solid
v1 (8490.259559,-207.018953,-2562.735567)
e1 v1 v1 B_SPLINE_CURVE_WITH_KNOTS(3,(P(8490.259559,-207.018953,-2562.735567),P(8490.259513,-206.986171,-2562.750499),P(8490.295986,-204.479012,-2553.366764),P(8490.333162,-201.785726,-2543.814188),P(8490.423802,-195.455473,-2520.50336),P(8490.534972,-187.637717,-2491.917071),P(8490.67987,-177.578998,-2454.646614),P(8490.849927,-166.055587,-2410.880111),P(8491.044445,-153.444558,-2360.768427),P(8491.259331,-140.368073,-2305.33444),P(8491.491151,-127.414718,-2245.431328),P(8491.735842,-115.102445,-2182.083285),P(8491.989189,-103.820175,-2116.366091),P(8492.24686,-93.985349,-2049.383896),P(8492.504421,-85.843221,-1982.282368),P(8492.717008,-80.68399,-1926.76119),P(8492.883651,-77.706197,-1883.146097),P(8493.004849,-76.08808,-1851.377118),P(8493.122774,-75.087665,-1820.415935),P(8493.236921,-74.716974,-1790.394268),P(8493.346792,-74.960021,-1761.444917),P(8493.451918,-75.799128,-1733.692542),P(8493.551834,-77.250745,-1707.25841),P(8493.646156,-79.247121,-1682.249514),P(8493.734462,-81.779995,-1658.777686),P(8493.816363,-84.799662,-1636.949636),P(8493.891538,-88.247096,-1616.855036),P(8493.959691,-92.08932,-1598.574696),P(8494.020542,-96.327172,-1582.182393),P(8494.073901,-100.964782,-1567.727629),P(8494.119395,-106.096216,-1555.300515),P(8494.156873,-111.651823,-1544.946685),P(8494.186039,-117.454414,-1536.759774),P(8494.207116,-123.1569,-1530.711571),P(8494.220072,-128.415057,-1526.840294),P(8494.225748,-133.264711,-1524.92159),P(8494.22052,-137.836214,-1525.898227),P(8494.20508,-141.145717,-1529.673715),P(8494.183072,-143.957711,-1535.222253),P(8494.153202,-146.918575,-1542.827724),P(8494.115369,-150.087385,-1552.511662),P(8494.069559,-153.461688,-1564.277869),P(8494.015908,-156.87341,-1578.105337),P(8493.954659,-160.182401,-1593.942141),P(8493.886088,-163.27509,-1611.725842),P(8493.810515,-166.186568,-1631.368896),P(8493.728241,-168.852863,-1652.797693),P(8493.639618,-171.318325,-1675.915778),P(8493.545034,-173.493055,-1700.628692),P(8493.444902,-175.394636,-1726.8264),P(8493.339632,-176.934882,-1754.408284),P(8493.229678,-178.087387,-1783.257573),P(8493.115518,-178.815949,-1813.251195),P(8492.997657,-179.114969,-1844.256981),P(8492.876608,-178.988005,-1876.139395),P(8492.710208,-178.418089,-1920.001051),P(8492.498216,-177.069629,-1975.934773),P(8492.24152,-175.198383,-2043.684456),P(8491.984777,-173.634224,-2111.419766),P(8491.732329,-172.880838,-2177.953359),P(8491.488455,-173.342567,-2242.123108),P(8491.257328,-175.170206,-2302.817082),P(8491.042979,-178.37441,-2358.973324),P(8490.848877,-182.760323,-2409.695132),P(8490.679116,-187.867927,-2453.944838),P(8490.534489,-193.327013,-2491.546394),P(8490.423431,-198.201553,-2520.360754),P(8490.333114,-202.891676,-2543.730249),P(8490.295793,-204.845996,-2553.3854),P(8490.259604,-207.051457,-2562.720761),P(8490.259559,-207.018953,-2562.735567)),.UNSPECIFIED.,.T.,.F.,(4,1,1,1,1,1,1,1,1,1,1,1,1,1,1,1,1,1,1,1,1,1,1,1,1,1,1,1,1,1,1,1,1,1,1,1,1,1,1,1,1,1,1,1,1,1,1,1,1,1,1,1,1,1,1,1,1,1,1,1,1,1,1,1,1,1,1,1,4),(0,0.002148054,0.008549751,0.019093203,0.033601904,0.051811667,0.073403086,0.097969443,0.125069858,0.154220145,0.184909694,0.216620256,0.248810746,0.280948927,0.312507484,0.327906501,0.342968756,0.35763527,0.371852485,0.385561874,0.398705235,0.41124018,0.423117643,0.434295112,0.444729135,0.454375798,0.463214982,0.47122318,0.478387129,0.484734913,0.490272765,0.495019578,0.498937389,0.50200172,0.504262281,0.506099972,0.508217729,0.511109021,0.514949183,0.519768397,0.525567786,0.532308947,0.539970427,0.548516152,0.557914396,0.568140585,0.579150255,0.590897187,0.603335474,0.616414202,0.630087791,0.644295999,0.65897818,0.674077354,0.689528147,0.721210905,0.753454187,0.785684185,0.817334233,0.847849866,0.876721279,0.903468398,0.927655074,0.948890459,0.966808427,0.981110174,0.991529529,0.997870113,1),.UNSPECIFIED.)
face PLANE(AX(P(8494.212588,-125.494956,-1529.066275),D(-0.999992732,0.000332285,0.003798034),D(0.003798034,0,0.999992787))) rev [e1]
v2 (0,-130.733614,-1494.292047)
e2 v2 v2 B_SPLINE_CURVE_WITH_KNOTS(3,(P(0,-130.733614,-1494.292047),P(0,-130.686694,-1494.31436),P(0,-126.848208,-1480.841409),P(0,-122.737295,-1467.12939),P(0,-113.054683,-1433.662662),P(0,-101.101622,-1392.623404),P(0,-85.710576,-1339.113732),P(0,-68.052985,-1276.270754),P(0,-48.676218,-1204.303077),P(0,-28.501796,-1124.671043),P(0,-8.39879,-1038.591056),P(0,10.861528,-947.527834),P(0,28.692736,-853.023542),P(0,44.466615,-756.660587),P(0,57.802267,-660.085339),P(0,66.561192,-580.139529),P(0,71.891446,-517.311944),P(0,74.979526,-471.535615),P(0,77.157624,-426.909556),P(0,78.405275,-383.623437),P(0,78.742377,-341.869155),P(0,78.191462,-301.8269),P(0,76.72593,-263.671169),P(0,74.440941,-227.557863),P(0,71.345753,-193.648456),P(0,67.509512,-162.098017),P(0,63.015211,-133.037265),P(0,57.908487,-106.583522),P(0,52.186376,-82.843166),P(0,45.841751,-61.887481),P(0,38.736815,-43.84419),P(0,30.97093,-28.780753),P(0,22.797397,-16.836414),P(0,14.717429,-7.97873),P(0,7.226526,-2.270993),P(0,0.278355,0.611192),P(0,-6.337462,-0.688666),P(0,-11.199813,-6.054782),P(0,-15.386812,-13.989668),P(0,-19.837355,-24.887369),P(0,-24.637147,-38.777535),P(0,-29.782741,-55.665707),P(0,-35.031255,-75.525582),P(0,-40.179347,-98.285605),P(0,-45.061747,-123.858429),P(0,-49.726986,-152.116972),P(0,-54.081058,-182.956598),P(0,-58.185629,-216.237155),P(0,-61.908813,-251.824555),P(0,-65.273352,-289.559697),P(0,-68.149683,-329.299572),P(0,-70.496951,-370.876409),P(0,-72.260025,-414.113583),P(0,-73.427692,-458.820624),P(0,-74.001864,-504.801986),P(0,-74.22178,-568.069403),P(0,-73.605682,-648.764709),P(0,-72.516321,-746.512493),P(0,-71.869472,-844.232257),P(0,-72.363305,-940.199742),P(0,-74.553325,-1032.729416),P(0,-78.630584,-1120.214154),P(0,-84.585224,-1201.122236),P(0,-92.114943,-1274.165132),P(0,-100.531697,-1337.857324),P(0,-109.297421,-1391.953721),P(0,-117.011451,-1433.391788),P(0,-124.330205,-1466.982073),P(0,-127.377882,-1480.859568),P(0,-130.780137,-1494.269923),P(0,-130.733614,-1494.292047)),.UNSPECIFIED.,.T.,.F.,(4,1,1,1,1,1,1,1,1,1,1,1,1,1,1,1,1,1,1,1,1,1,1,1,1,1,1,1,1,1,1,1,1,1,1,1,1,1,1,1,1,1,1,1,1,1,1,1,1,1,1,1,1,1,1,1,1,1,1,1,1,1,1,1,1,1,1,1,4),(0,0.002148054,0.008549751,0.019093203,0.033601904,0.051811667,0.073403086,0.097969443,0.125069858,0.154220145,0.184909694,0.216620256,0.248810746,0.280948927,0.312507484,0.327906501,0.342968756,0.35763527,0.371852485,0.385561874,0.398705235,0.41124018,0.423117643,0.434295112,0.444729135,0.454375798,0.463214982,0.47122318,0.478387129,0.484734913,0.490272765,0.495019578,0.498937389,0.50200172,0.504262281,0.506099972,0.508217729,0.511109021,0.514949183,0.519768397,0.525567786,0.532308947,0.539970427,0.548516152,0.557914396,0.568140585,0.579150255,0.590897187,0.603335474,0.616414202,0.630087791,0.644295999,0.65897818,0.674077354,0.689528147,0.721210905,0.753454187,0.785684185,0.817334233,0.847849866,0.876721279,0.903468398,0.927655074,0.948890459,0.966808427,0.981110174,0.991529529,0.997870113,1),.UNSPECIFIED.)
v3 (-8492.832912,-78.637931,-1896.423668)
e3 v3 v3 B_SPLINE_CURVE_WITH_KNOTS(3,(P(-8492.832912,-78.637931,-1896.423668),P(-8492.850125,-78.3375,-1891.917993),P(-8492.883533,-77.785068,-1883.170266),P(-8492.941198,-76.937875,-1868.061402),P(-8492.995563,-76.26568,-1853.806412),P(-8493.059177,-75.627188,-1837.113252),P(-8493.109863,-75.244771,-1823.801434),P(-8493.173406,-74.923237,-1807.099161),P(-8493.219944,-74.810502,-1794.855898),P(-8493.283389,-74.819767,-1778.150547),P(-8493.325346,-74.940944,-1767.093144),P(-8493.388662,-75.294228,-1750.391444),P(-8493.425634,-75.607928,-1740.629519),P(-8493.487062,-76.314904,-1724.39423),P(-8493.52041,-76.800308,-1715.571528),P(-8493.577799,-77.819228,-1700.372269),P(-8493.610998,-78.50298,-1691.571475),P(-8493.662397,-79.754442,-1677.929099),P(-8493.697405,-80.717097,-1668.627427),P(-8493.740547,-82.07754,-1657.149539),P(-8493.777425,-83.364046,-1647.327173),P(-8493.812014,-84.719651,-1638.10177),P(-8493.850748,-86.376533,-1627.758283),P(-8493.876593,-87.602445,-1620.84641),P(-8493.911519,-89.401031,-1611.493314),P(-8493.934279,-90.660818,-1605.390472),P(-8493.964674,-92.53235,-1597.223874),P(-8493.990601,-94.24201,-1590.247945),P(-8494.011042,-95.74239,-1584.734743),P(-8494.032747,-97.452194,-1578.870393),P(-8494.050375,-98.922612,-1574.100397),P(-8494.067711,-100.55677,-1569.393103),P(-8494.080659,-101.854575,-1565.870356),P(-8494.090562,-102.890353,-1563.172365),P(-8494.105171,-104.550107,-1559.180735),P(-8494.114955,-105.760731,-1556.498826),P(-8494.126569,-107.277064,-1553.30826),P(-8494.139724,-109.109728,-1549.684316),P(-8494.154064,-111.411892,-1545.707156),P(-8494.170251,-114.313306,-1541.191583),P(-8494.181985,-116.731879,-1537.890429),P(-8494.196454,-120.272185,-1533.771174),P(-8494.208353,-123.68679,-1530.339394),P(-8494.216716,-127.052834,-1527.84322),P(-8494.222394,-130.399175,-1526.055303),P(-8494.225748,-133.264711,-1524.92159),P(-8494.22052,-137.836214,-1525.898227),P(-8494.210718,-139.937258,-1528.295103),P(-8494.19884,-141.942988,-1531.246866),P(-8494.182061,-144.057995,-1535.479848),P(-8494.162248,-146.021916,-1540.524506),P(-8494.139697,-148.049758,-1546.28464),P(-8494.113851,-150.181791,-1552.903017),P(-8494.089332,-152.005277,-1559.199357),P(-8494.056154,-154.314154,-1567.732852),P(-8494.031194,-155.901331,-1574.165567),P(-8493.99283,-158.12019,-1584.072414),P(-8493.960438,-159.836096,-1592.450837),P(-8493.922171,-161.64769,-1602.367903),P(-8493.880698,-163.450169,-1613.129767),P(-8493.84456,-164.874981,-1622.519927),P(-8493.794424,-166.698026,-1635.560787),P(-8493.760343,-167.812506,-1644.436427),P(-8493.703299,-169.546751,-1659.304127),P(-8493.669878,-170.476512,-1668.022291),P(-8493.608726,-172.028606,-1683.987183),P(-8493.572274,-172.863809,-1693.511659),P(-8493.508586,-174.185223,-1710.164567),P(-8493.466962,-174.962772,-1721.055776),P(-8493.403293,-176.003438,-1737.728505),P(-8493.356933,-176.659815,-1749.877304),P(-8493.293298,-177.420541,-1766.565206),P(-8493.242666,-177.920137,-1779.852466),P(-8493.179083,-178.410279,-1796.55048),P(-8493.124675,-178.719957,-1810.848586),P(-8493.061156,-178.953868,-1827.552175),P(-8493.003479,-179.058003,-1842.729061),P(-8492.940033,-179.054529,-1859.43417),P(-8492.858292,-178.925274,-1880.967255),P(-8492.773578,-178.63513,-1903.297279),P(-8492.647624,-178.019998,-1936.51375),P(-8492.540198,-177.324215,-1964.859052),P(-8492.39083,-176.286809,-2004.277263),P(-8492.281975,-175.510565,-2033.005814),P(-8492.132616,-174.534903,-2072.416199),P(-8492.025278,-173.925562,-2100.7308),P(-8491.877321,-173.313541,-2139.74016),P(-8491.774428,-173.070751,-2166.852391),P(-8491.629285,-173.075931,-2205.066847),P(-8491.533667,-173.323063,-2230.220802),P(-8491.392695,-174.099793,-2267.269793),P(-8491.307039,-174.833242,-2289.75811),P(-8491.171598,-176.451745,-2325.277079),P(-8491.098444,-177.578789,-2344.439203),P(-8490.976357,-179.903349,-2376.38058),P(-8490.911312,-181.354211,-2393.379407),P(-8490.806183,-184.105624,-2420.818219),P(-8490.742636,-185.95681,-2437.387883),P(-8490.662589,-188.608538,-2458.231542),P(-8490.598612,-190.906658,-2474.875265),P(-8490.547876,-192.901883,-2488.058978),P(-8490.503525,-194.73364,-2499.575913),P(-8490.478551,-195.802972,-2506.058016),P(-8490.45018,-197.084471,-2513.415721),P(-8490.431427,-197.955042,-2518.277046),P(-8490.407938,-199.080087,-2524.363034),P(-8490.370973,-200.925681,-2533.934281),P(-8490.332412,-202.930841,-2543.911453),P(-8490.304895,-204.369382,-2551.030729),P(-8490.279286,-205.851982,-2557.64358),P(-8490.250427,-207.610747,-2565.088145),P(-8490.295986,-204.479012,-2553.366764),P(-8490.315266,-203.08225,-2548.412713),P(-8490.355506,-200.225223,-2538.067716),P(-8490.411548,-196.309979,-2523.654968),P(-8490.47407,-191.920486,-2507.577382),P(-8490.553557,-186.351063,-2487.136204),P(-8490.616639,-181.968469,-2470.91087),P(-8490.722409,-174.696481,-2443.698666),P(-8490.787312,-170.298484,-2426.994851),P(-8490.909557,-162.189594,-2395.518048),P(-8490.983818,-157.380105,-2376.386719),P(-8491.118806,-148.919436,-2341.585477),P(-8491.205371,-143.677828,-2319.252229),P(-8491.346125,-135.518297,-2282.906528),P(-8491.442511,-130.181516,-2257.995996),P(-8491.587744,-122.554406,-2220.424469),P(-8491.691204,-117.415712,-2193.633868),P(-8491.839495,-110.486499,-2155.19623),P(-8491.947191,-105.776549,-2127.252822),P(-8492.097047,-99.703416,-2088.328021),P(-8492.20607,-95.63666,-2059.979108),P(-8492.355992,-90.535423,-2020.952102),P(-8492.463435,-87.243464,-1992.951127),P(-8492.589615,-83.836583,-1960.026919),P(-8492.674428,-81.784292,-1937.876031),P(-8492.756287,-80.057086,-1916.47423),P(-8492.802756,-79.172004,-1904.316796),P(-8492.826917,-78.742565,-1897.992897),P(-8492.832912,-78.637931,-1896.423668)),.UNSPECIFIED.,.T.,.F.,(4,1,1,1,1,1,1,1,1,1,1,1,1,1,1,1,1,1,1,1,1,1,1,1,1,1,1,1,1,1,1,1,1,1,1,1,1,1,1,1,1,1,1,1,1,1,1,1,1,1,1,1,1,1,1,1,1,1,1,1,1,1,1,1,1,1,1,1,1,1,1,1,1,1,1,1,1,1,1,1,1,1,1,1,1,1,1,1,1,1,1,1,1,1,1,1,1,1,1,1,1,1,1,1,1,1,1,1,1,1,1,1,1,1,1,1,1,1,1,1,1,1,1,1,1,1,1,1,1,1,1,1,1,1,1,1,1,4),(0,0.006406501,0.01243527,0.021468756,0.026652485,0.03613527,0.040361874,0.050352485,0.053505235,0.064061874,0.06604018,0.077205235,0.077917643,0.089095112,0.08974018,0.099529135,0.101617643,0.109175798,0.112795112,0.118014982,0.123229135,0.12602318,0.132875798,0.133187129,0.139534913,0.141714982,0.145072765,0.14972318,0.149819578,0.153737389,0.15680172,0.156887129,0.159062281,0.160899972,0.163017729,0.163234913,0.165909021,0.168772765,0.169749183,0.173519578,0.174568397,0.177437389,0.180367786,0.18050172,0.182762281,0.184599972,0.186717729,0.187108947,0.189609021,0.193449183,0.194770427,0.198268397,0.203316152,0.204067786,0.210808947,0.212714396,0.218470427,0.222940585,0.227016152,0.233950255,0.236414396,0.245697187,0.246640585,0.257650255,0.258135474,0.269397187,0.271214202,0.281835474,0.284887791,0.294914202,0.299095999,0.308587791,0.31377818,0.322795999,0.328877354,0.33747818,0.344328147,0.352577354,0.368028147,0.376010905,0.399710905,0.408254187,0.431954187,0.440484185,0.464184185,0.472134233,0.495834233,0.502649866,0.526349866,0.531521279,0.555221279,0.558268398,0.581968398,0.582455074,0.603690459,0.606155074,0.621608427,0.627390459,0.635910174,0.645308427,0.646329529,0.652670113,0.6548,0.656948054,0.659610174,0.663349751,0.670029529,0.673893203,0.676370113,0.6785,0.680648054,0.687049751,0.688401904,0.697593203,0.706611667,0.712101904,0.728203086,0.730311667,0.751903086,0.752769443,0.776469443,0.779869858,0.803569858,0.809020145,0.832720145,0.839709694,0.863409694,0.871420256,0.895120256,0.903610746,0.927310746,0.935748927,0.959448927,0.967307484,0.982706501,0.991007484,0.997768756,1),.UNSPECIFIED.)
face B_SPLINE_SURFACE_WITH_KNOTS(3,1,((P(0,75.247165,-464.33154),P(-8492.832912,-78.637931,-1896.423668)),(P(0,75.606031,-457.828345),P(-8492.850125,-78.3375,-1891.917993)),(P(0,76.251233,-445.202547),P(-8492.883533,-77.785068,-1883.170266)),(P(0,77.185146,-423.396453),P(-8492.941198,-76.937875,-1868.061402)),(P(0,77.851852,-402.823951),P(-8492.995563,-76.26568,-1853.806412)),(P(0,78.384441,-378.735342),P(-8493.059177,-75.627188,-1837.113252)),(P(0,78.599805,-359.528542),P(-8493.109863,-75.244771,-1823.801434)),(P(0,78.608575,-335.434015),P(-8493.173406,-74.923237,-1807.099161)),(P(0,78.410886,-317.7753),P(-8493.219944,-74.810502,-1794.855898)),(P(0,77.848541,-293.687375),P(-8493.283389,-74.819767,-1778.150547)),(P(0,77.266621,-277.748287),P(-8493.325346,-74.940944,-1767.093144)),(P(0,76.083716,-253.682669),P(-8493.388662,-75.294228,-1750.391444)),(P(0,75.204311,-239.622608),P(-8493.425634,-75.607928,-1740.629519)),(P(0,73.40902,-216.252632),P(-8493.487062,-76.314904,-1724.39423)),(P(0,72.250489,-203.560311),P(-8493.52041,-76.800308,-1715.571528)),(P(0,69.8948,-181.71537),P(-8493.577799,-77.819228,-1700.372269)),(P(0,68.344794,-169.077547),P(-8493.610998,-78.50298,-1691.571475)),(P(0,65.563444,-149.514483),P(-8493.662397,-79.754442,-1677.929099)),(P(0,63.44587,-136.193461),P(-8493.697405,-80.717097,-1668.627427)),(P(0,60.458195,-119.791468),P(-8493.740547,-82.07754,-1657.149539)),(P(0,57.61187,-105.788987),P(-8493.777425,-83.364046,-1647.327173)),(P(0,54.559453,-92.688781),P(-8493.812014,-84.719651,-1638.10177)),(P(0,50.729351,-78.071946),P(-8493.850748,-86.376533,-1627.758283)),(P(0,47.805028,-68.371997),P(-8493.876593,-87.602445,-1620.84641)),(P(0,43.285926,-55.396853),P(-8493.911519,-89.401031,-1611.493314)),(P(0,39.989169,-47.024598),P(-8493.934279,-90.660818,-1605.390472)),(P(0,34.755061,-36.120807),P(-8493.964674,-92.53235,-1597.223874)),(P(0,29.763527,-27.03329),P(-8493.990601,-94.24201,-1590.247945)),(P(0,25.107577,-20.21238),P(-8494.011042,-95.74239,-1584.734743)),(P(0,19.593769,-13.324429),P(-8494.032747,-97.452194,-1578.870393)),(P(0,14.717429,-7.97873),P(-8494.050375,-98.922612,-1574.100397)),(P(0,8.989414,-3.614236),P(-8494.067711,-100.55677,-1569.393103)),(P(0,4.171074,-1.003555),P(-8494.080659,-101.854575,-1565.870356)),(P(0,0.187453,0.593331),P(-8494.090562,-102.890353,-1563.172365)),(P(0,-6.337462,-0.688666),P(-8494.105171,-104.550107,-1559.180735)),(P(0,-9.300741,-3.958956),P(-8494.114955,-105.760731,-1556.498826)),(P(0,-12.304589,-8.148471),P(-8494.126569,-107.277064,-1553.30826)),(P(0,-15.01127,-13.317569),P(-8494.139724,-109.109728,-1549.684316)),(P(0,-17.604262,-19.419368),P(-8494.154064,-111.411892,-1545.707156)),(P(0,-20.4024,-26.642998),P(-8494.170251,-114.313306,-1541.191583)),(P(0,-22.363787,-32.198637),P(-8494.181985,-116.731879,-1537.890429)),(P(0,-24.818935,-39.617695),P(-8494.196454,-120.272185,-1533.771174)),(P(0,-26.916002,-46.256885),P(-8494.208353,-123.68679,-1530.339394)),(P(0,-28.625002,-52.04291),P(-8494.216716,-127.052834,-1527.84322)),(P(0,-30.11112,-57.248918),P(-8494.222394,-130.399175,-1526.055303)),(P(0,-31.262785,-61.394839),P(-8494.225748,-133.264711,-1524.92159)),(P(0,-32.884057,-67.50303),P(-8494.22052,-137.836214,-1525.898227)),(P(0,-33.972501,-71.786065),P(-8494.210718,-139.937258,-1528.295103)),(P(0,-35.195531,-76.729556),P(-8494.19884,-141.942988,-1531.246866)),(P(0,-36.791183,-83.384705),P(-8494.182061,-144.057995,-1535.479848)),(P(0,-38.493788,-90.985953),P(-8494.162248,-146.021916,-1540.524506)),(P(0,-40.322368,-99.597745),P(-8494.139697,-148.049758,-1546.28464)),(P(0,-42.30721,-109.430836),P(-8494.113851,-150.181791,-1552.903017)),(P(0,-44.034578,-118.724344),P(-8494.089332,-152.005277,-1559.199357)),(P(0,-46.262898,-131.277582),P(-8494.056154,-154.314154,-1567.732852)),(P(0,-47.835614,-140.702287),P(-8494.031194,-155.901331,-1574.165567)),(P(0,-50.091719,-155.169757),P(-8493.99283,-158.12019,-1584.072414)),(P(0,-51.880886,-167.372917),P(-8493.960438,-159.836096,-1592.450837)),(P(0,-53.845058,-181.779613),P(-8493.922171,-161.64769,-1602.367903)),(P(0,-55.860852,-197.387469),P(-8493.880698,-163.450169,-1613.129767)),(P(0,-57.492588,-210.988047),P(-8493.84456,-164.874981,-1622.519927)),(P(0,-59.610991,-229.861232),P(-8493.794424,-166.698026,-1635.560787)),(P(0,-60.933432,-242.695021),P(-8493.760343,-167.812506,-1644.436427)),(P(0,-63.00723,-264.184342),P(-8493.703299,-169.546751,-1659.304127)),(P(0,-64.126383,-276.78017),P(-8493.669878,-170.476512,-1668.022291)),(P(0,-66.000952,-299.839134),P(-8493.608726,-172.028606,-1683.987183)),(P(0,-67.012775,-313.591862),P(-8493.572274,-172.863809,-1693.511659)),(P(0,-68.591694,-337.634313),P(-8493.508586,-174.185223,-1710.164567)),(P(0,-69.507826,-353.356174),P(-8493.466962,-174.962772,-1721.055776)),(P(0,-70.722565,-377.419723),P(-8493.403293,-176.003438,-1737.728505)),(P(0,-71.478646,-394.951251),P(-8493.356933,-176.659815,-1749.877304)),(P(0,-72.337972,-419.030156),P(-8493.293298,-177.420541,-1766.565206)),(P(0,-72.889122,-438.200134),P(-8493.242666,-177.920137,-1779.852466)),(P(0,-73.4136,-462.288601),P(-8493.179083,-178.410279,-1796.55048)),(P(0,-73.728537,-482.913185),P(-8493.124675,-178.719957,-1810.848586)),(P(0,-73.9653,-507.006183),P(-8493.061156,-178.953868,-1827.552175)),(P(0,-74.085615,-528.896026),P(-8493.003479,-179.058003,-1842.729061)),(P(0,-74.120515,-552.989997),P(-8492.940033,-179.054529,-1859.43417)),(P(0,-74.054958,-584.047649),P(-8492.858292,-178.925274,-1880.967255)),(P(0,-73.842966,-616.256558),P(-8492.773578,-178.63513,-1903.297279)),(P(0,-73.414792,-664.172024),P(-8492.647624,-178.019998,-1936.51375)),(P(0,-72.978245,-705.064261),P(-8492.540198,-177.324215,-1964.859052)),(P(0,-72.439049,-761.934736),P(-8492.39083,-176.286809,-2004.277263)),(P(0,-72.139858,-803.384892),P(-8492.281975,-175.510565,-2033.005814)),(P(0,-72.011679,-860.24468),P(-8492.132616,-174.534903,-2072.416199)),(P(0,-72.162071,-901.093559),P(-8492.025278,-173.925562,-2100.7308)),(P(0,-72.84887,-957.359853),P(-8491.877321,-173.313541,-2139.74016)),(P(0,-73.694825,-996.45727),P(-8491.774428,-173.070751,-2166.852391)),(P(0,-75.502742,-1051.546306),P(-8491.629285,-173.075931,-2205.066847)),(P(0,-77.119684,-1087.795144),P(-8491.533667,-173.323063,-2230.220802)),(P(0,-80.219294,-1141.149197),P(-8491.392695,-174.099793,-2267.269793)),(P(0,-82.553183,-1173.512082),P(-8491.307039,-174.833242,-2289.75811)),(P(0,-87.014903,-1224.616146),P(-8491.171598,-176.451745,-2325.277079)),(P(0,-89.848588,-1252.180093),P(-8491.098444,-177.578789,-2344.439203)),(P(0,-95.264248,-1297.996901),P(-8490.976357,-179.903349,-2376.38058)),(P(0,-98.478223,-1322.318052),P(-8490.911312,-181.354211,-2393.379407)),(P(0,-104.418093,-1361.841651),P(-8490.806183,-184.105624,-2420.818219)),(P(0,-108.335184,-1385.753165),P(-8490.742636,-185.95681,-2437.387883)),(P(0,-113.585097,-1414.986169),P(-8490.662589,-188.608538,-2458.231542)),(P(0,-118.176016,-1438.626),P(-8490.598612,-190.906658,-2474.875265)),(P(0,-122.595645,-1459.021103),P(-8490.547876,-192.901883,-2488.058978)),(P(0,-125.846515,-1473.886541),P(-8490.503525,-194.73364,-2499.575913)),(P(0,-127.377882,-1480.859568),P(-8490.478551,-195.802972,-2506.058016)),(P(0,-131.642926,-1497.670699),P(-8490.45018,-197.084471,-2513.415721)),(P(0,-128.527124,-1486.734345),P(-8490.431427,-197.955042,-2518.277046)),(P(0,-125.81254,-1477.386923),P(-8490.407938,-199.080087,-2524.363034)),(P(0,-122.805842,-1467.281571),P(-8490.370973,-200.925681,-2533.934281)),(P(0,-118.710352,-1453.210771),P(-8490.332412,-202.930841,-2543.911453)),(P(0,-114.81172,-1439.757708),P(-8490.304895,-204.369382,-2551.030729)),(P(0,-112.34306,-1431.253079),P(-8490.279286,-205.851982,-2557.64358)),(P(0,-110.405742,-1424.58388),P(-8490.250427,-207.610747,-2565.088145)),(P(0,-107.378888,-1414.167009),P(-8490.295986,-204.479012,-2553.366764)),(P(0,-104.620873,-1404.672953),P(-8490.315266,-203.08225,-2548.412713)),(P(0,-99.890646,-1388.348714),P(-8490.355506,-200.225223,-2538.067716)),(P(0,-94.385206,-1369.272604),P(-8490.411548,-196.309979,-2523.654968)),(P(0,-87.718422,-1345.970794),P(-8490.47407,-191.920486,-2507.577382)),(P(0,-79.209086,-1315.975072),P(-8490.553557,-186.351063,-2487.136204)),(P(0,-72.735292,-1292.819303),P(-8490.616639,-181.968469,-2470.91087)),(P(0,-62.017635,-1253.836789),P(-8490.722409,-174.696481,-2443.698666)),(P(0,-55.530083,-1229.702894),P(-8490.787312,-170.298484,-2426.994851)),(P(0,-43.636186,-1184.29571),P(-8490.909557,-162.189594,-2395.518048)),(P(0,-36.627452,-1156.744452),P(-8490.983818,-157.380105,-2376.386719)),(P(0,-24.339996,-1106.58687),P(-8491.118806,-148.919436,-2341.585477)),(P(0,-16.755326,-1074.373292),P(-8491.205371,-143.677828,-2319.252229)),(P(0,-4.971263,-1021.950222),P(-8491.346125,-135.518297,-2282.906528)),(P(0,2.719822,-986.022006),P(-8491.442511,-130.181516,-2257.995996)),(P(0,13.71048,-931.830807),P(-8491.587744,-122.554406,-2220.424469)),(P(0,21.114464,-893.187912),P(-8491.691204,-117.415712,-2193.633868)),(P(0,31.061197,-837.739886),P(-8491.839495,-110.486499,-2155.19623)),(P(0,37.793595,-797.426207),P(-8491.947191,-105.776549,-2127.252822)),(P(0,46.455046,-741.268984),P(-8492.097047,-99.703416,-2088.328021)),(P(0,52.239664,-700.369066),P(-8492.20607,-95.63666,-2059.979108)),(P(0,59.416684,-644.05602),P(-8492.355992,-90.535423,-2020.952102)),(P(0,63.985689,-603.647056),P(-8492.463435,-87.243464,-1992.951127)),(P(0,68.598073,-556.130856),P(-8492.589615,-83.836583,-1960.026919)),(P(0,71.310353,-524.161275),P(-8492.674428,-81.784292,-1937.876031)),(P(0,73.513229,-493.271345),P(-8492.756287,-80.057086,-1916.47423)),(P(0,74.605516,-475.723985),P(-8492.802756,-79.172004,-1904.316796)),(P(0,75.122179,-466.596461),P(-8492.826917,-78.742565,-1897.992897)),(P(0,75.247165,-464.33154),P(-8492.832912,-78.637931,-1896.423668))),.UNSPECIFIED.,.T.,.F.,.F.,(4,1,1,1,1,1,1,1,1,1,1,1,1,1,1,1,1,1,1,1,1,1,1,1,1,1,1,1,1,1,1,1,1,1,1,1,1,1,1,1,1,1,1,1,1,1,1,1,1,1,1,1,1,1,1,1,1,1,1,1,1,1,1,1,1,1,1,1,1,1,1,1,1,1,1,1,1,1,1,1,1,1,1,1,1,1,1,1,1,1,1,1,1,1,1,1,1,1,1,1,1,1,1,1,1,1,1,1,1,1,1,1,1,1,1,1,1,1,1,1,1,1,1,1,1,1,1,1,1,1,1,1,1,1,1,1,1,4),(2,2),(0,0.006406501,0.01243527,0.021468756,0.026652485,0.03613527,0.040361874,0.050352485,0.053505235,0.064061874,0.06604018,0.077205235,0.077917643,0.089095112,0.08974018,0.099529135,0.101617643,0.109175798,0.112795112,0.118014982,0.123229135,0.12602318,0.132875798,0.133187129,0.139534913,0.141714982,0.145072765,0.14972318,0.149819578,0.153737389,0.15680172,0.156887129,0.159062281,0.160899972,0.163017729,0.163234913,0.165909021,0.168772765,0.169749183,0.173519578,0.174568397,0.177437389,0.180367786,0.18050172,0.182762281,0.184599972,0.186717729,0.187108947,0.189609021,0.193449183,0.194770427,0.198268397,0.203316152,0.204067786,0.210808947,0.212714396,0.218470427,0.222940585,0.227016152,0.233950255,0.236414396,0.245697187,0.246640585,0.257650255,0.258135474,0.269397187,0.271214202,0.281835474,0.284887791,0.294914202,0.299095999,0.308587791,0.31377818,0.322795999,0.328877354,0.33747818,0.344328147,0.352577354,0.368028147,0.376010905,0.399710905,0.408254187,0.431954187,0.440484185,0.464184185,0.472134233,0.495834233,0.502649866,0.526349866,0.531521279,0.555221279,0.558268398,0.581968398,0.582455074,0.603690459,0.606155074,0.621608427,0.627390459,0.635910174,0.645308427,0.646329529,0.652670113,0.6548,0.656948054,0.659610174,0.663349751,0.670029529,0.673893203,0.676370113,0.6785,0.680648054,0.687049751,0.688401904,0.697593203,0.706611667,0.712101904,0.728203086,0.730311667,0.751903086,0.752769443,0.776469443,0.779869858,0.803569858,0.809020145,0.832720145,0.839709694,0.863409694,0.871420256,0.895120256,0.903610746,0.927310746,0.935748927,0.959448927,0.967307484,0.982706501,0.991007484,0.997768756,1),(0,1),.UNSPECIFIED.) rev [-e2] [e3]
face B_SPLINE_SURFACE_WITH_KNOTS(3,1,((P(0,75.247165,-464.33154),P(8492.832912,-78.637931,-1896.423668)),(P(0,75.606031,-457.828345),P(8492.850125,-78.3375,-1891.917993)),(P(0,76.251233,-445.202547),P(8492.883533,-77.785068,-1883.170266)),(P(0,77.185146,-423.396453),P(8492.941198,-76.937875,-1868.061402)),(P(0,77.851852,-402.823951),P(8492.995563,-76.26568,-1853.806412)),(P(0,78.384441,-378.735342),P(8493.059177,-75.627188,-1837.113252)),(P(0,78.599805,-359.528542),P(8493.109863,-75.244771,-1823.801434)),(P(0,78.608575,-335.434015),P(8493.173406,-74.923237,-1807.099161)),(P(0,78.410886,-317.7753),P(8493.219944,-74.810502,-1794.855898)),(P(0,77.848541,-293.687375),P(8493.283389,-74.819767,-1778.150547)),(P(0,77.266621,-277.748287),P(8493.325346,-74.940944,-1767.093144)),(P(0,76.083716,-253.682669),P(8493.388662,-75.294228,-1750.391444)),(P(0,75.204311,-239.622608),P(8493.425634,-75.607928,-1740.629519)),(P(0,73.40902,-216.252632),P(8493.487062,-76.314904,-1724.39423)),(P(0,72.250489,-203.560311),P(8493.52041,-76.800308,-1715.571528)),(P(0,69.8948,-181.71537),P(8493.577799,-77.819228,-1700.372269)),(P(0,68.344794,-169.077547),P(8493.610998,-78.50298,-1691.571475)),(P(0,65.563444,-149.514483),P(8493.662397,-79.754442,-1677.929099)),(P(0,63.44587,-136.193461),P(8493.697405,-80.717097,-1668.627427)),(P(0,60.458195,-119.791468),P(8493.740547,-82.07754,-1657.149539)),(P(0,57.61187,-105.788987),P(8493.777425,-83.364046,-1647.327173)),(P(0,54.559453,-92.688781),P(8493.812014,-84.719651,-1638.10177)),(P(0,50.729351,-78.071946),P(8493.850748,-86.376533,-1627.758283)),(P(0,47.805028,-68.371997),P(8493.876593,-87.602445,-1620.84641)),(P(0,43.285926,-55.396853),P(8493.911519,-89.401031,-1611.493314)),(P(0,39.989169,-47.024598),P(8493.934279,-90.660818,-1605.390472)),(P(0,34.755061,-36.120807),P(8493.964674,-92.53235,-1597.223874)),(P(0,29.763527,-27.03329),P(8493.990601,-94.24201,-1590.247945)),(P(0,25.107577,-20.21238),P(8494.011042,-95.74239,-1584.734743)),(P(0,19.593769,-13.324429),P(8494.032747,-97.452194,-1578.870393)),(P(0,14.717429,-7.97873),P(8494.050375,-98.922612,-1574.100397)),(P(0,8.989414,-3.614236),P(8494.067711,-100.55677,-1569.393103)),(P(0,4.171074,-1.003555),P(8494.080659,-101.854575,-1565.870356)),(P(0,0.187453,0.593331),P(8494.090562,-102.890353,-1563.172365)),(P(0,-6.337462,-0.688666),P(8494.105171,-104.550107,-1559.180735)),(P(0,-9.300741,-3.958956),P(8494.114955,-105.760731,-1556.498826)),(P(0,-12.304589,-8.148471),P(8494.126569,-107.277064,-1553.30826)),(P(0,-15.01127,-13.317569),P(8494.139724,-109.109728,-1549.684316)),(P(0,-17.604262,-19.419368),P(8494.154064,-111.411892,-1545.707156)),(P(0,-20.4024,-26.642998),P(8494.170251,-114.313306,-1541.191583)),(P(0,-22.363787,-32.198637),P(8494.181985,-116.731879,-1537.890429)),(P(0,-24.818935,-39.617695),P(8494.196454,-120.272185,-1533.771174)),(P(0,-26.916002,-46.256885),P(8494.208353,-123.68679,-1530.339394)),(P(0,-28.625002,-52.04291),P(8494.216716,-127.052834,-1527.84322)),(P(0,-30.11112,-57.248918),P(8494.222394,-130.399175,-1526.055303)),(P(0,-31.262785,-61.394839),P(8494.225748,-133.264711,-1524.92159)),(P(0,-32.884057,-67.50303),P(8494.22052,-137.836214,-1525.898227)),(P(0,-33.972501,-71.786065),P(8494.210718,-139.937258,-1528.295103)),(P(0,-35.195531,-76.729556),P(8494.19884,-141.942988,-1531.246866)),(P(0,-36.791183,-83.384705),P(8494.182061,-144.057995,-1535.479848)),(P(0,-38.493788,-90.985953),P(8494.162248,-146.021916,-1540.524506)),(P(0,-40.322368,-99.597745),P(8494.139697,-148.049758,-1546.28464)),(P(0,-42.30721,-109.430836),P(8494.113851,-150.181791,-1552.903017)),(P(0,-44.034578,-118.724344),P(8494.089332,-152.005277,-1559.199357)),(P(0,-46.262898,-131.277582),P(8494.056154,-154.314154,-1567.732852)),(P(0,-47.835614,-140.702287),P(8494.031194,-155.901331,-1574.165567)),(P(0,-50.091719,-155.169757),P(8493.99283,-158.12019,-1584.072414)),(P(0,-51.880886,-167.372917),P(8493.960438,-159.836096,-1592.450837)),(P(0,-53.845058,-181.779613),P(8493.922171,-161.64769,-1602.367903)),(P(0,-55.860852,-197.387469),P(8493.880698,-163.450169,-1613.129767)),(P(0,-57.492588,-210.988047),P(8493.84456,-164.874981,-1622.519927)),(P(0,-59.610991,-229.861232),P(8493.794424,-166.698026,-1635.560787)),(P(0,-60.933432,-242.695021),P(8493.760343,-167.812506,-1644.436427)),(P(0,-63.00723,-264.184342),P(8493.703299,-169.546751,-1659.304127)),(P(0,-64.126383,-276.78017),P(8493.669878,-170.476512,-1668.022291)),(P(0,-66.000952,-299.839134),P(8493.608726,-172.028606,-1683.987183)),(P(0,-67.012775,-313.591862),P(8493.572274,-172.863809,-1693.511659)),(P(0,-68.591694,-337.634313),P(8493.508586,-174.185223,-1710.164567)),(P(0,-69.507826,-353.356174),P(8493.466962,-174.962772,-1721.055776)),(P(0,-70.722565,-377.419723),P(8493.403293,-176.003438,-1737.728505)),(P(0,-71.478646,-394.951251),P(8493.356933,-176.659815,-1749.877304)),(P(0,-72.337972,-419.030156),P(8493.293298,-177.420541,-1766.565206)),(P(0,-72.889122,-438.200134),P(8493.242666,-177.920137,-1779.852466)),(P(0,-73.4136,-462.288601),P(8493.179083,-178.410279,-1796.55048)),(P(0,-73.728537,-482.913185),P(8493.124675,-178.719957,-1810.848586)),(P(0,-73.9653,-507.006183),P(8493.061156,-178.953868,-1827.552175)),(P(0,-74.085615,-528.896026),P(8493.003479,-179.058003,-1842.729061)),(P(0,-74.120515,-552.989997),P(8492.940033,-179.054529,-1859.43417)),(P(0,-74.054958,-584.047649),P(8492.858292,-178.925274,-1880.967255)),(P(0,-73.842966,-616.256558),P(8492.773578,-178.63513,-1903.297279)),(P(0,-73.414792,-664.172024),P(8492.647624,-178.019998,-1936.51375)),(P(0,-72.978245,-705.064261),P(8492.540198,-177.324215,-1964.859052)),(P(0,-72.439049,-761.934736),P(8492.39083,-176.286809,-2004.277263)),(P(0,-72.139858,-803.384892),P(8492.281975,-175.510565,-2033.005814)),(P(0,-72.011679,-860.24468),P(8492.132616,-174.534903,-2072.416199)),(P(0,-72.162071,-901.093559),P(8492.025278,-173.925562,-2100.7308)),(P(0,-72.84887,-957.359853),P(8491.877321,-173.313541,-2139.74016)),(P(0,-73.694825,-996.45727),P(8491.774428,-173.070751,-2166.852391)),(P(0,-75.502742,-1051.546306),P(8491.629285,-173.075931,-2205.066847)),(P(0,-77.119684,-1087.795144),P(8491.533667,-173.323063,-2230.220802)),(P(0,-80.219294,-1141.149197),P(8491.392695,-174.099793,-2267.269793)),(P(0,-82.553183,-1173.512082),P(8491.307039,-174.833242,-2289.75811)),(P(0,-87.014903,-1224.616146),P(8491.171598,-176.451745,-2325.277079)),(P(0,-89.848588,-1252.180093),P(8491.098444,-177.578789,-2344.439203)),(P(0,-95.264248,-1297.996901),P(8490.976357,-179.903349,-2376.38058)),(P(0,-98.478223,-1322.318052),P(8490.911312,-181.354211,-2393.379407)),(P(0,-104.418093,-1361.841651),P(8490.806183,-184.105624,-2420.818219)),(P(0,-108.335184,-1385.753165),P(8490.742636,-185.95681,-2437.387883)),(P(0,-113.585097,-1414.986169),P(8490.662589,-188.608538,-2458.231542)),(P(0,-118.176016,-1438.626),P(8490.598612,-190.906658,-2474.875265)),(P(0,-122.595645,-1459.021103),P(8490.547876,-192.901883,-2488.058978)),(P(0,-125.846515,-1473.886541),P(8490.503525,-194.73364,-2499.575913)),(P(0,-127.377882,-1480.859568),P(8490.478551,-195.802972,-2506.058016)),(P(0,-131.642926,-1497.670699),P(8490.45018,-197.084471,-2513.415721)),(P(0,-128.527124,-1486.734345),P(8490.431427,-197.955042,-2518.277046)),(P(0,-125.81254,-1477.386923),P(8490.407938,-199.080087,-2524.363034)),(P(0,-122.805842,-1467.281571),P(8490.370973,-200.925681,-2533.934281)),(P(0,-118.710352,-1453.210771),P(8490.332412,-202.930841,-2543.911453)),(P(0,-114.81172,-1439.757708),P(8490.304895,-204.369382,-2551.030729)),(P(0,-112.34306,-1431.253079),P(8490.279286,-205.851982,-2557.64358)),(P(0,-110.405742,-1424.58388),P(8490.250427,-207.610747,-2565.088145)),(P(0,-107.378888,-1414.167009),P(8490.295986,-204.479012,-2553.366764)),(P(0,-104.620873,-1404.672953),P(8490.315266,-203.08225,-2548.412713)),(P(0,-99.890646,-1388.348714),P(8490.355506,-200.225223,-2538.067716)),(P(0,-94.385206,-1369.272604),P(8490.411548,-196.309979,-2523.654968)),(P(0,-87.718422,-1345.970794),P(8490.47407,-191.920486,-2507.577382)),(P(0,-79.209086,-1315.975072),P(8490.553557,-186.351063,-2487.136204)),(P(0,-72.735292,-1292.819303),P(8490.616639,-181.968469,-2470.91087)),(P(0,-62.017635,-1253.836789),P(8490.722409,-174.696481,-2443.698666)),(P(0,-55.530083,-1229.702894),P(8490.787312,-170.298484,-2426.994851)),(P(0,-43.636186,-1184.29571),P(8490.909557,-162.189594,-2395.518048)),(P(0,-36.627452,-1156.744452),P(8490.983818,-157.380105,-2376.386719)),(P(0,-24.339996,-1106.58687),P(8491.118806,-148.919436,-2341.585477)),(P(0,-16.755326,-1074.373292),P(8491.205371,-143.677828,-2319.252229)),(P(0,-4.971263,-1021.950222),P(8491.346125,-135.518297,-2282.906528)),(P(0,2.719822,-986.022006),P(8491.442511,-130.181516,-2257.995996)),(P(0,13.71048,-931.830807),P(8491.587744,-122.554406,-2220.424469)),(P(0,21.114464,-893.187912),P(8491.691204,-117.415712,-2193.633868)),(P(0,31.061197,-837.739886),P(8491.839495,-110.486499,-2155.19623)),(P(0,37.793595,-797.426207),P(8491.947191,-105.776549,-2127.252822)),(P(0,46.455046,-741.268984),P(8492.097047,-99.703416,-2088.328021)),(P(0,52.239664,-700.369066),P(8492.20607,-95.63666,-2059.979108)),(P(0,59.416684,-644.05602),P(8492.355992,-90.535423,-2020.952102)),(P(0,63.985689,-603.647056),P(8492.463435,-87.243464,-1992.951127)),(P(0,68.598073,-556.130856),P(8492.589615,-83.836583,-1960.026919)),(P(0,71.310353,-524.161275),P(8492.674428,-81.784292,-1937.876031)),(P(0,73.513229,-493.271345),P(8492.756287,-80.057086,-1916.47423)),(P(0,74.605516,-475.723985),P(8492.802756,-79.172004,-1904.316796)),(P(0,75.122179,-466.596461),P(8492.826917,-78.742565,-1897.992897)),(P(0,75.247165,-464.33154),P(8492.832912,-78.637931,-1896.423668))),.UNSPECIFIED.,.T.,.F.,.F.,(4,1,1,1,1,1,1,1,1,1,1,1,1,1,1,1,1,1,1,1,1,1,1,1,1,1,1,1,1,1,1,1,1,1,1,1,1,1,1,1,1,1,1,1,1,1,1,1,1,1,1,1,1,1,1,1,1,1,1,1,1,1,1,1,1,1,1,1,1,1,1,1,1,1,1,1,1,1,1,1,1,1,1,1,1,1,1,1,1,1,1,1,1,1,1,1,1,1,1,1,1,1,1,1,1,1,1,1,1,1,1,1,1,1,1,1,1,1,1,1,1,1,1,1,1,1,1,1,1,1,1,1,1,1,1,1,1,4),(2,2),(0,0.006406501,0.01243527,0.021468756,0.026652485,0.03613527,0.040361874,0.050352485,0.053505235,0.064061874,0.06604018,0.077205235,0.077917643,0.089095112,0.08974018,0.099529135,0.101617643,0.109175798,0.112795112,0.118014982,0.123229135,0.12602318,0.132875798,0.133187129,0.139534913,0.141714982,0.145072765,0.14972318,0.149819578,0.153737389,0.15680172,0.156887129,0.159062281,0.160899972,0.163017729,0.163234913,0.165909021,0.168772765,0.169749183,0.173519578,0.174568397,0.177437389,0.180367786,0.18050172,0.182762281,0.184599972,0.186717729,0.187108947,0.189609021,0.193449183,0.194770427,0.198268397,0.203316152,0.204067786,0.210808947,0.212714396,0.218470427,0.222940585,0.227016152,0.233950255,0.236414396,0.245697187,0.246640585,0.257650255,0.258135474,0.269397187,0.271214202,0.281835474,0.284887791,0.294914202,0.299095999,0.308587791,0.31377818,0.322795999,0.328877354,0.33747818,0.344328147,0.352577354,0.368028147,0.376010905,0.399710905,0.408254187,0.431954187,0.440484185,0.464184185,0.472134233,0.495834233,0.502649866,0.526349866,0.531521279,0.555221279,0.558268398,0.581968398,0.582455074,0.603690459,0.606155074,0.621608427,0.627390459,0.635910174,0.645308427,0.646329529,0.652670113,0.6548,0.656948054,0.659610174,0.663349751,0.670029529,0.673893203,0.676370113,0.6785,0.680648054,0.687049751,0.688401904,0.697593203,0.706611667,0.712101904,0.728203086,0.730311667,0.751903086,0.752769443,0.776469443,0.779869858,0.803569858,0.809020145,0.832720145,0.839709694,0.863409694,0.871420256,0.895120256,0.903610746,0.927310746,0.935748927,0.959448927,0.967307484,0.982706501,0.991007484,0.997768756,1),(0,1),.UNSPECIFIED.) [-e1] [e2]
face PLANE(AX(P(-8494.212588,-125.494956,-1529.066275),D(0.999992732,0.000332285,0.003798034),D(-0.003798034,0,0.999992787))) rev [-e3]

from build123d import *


with BuildPart() as part:
    # Loft3: read off the stored shape, not the designer's step
    # Loft3: loft between two sections, ruled curve by curve
    loft3_from = [
        Edge.make_bspline([(0, 75.247164627, -464.331540038), (0, 75.6060312, -457.82834533), (0, 76.2512327, -445.202547271), (0, 77.185146332, -423.396453137), (0, 77.851852326, -402.823951314), (0, 78.384441428, -378.735341731), (0, 78.599804642, -359.528542379), (0, 78.608574869, -335.434014553), (0, 78.410885776, -317.775299745), (0, 77.848540939, -293.687374761), (0, 77.266621088, -277.74828718), (0, 76.083715702, -253.682669347), (0, 75.204310786, -239.622607867), (0, 73.409020466, -216.252631889), (0, 72.250488825, -203.560310534), (0, 69.894800386, -181.715370443), (0, 68.344793791, -169.077547252), (0, 65.563444266, -149.514482666), (0, 63.445869974, -136.193461261), (0, 60.458195228, -119.791467615), (0, 57.611870491, -105.788986828), (0, 54.559453297, -92.688781018), (0, 50.729350644, -78.07194621), (0, 47.805028256, -68.371996538), (0, 43.285925655, -55.396852793), (0, 39.989169381, -47.024598313), (0, 34.755060544, -36.120807184), (0, 29.763527307, -27.033289804), (0, 25.107576593, -20.212379723), (0, 19.593769028, -13.324429015), (0, 14.717428586, -7.978729509), (0, 8.989414294, -3.614235784), (0, 4.171073763, -1.003554796), (0, 0.187452705, 0.593331348), (0, -6.337462482, -0.688665746), (0, -9.3007413, -3.958956156), (0, -12.304589132, -8.148470763), (0, -15.011270114, -13.317568851), (0, -17.604262314, -19.419368117), (0, -20.402400466, -26.642998258), (0, -22.363786989, -32.198636636), (0, -24.818935213, -39.617694728), (0, -26.916002004, -46.256885049), (0, -28.625001833, -52.042910185), (0, -30.111119868, -57.248917562), (0, -31.26278527, -61.394839145), (0, -32.884056502, -67.503030242), (0, -33.972501406, -71.786064636), (0, -35.195531482, -76.729555832), (0, -36.791182642, -83.384705035), (0, -38.493788216, -90.985953223), (0, -40.322368465, -99.597744987), (0, -42.307210197, -109.430836061), (0, -44.03457841, -118.724344416), (0, -46.262898048, -131.27758197), (0, -47.835614034, -140.702287296), (0, -50.091719165, -155.169756997), (0, -51.880886195, -167.372916857), (0, -53.845057805, -181.779612589), (0, -55.860851943, -197.387469346), (0, -57.492587754, -210.98804695), (0, -59.6109912, -229.861232229), (0, -60.933432411, -242.695021315), (0, -63.007230447, -264.184341873), (0, -64.126383253, -276.780169982), (0, -66.000951687, -299.839134327), (0, -67.012774981, -313.591861628), (0, -68.591693682, -337.634312849), (0, -69.507825803, -353.356173568), (0, -70.722564952, -377.419723199), (0, -71.478645865, -394.951250589), (0, -72.337971873, -419.030156153), (0, -72.889121706, -438.200134272), (0, -73.413599827, -462.288601341), (0, -73.728537136, -482.913185263), (0, -73.965299975, -507.006183041), (0, -74.085614533, -528.896025913), (0, -74.120515145, -552.989997208), (0, -74.05495843, -584.047648937), (0, -73.842966104, -616.256557677), (0, -73.414792031, -664.172023615), (0, -72.978245239, -705.064261293), (0, -72.439049051, -761.934735513), (0, -72.139858031, -803.384892477), (0, -72.011678844, -860.244680129), (0, -72.16207099, -901.093558595), (0, -72.848870113, -957.359853077), (0, -73.69482498, -996.457270019), (0, -75.502741586, -1051.546305771), (0, -77.119683908, -1087.795144307), (0, -80.219293997, -1141.149197232), (0, -82.553183427, -1173.512082095), (0, -87.014903347, -1224.616146322), (0, -89.848587872, -1252.180092773), (0, -95.264248106, -1297.996900966), (0, -98.478223443, -1322.318052233), (0, -104.418092524, -1361.841651034), (0, -108.335183761, -1385.753165153), (0, -113.585096912, -1414.986169203), (0, -118.176015732, -1438.625999881), (0, -122.595644632, -1459.021103053), (0, -125.8465154, -1473.886541251), (0, -127.377882012, -1480.859568216), (0, -131.642925945, -1497.670698678), (0, -128.527124068, -1486.734344721), (0, -125.812540371, -1477.386922633), (0, -122.805841688, -1467.281570547), (0, -118.71035201, -1453.210770692), (0, -114.811720143, -1439.757708319), (0, -112.34306017, -1431.253079279), (0, -110.405742131, -1424.583880294), (0, -107.378888486, -1414.167008781), (0, -104.620873392, -1404.672953379), (0, -99.890645793, -1388.348713749), (0, -94.385205618, -1369.272603864), (0, -87.718422183, -1345.970793561), (0, -79.209085893, -1315.975072113), (0, -72.735292135, -1292.819303198), (0, -62.017635352, -1253.836788849), (0, -55.530082507, -1229.702894441), (0, -43.636185572, -1184.295710226), (0, -36.627451615, -1156.744451925), (0, -24.339995571, -1106.586869976), (0, -16.755325965, -1074.373292423), (0, -4.971262664, -1021.950221986), (0, 2.719821527, -986.022006307), (0, 13.710480053, -931.830807409), (0, 21.114463837, -893.187912419), (0, 31.061196595, -837.73988643), (0, 37.793594993, -797.426206509), (0, 46.455045837, -741.26898439), (0, 52.239663992, -700.369066294), (0, 59.416683555, -644.05602025), (0, 63.985689249, -603.647055736), (0, 68.598073201, -556.130856178), (0, 71.310352704, -524.161275317), (0, 73.513229465, -493.271344733), (0, 74.605515967, -475.723985212), (0, 75.122179245, -466.596460587), (0, 75.247164627, -464.331540038)], [0, 0, 0, 0, 0.006406501, 0.01243527, 0.021468756, 0.026652485, 0.03613527, 0.040361874, 0.050352485, 0.053505235, 0.064061874, 0.06604018, 0.077205235, 0.077917643, 0.089095112, 0.08974018, 0.099529135, 0.101617643, 0.109175798, 0.112795112, 0.118014982, 0.123229135, 0.12602318, 0.132875798, 0.133187129, 0.139534913, 0.141714982, 0.145072765, 0.14972318, 0.149819578, 0.153737389, 0.15680172, 0.156887129, 0.159062281, 0.160899972, 0.163017729, 0.163234913, 0.165909021, 0.168772765, 0.169749183, 0.173519578, 0.174568397, 0.177437389, 0.180367786, 0.18050172, 0.182762281, 0.184599972, 0.186717729, 0.187108947, 0.189609021, 0.193449183, 0.194770427, 0.198268397, 0.203316152, 0.204067786, 0.210808947, 0.212714396, 0.218470427, 0.222940585, 0.227016152, 0.233950255, 0.236414396, 0.245697187, 0.246640585, 0.257650255, 0.258135474, 0.269397187, 0.271214202, 0.281835474, 0.284887791, 0.294914202, 0.299095999, 0.308587791, 0.31377818, 0.322795999, 0.328877354, 0.33747818, 0.344328147, 0.352577354, 0.368028147, 0.376010905, 0.399710905, 0.408254187, 0.431954187, 0.440484185, 0.464184185, 0.472134233, 0.495834233, 0.502649866, 0.526349866, 0.531521279, 0.555221279, 0.558268398, 0.581968398, 0.582455074, 0.603690459, 0.606155074, 0.621608427, 0.627390459, 0.635910174, 0.645308427, 0.646329529, 0.652670113, 0.6548, 0.656948054, 0.659610174, 0.663349751, 0.670029529, 0.673893203, 0.676370113, 0.6785, 0.680648054, 0.687049751, 0.688401904, 0.697593203, 0.706611667, 0.712101904, 0.728203086, 0.730311667, 0.751903086, 0.752769443, 0.776469443, 0.779869858, 0.803569858, 0.809020145, 0.832720145, 0.839709694, 0.863409694, 0.871420256, 0.895120256, 0.903610746, 0.927310746, 0.935748927, 0.959448927, 0.967307484, 0.982706501, 0.991007484, 0.997768756, 1, 1, 1, 1], 3),
    ]
    loft3_to = [
        Edge.make_bspline([(8492.832911869, -78.637931226, -1896.423668427), (8492.85012453, -78.337499617, -1891.917993478), (8492.883532504, -77.785067643, -1883.170266356), (8492.941198414, -76.937875392, -1868.061402132), (8492.995563108, -76.265679579, -1853.806412397), (8493.059176923, -75.627187523, -1837.113252347), (8493.109863102, -75.244771189, -1823.801434398), (8493.173406208, -74.923236896, -1807.09916141), (8493.21994434, -74.810501537, -1794.855897682), (8493.283389216, -74.819767162, -1778.150546507), (8493.325345648, -74.940943962, -1767.093144076), (8493.388662343, -75.294228288, -1750.391444414), (8493.425634499, -75.60792779, -1740.629519125), (8493.487062211, -76.314904494, -1724.394229982), (8493.520410083, -76.800308271, -1715.571528116), (8493.577799235, -77.819227556, -1700.372268646), (8493.610997989, -78.502979914, -1691.571475358), (8493.662396733, -79.754441715, -1677.929098828), (8493.69740518, -80.717097108, -1668.62742678), (8493.740546849, -82.077539842, -1657.149538892), (8493.777425312, -83.364045854, -1647.327172705), (8493.812013512, -84.719651468, -1638.101769545), (8493.850748153, -86.37653277, -1627.758282926), (8493.876592518, -87.602444815, -1620.846410033), (8493.911518506, -89.401030693, -1611.493314253), (8493.934278864, -90.660818051, -1605.390472432), (8493.964674223, -92.532350454, -1597.223874008), (8493.990601134, -94.242009526, -1590.247944949), (8494.011042058, -95.742389653, -1584.734742977), (8494.032747075, -97.452193951, -1578.870392987), (8494.050375213, -98.922612131, -1574.100397135), (8494.067710796, -100.556769631, -1569.393103163), (8494.080659164, -101.854574555, -1565.870355836), (8494.090562124, -102.890353394, -1563.172364784), (8494.105171066, -104.550106825, -1559.180734828), (8494.114954847, -105.760730674, -1556.498825975), (8494.126568956, -107.277063907, -1553.308259578), (8494.139723946, -109.109728474, -1549.684316212), (8494.154064465, -111.411892298, -1545.707156227), (8494.170250788, -114.313305802, -1541.191583012), (8494.181985112, -116.731879372, -1537.890429311), (8494.1964539, -120.272185221, -1533.771173748), (8494.208353383, -123.686789968, -1530.339393598), (8494.21671551, -127.052833513, -1527.843220404), (8494.222394184, -130.399175174, -1526.055302819), (8494.225747913, -133.264710698, -1524.921590173), (8494.220519533, -137.836213696, -1525.898227154), (8494.210717901, -139.937258133, -1528.295102892), (8494.198840443, -141.942988477, -1531.246866078), (8494.182060525, -144.057994724, -1535.479848449), (8494.162248016, -146.021915795, -1540.524506461), (8494.139696845, -148.049758421, -1546.284640347), (8494.113851396, -150.181790711, -1552.903016574), (8494.089331587, -152.005276777, -1559.199356561), (8494.056153634, -154.314154018, -1567.732851969), (8494.031194385, -155.90133084, -1574.165567436), (8493.992830272, -158.120189945, -1584.072413737), (8493.96043833, -159.836095738, -1592.450836702), (8493.922170729, -161.647690187, -1602.367903251), (8493.880697566, -163.450169347, -1613.129766853), (8493.844559711, -164.874980597, -1622.51992693), (8493.794423943, -166.698025841, -1635.560787489), (8493.760343388, -167.812506104, -1644.436427074), (8493.703298679, -169.546751355, -1659.304126751), (8493.669877606, -170.476512387, -1668.022290658), (8493.608726219, -172.0286061, -1683.987182746), (8493.572274143, -172.863808587, -1693.511659035), (8493.508586281, -174.18522341, -1710.16456693), (8493.466962425, -174.962772365, -1721.055776465), (8493.403292574, -176.003438399, -1737.728504636), (8493.356932576, -176.659815018, -1749.877304469), (8493.293298117, -177.420541151, -1766.565205721), (8493.242666274, -177.920137386, -1779.852465514), (8493.179083315, -178.410279455, -1796.550480228), (8493.124675324, -178.719957215, -1810.848586227), (8493.061156338, -178.953867694, -1827.552174668), (8493.003478985, -179.058003297, -1842.729060689), (8492.940033103, -179.054529441, -1859.434170027), (8492.858292065, -178.925274346, -1880.967255338), (8492.773577666, -178.635129509, -1903.297279344), (8492.64762386, -178.019998107, -1936.513750017), (8492.540197852, -177.32421509, -1964.859052283), (8492.390829771, -176.286809292, -2004.27726282), (8492.281974897, -175.510564979, -2033.005813559), (8492.132616021, -174.534903, -2072.416198685), (8492.025277895, -173.925561779, -2100.730799547), (8491.877321303, -173.313541005, -2139.740159816), (8491.774428053, -173.070750684, -2166.85239055), (8491.629285466, -173.075930987, -2205.066847053), (8491.533667072, -173.323062668, -2230.22080221), (8491.392694622, -174.099792931, -2267.269792579), (8491.307038889, -174.833242283, -2289.758109767), (8491.171597841, -176.451744851, -2325.277079239), (8491.098444408, -177.578789455, -2344.43920329), (8490.976356667, -179.903348644, -2376.380579713), (8490.911311968, -181.354210816, -2393.379406884), (8490.806183406, -184.105623897, -2420.818219029), (8490.742635674, -185.956809521, -2437.387882783), (8490.662589034, -188.608538034, -2458.231541823), (8490.59861151, -190.906657563, -2474.875264931), (8490.547875966, -192.901883164, -2488.058977844), (8490.503525265, -194.733640372, -2499.575913326), (8490.478550515, -195.802972287, -2506.058015568), (8490.450179668, -197.084470568, -2513.415721251), (8490.431426778, -197.955042419, -2518.277045572), (8490.40793798, -199.080086514, -2524.363034186), (8490.370972527, -200.925681447, -2533.93428071), (8490.332412322, -202.930840801, -2543.911452926), (8490.304894863, -204.369381672, -2551.030728773), (8490.279286198, -205.851982413, -2557.643579518), (8490.250426862, -207.610746697, -2565.088145438), (8490.29598603, -204.479012101, -2553.366763574), (8490.315265945, -203.082249868, -2548.412713348), (8490.355506237, -200.225222527, -2538.067716276), (8490.411547731, -196.309978722, -2523.654968082), (8490.474069969, -191.920486411, -2507.577381657), (8490.553557475, -186.351062771, -2487.136203545), (8490.616638575, -181.968468649, -2470.910869645), (8490.722408594, -174.69648071, -2443.698666301), (8490.787312116, -170.298483879, -2426.994850645), (8490.909557437, -162.189593809, -2395.518048032), (8490.983817537, -157.380104695, -2376.386719498), (8491.118806179, -148.919436204, -2341.585476667), (8491.205370953, -143.677828498, -2319.25222873), (8491.346125479, -135.518296765, -2282.906527749), (8491.442510562, -130.181515891, -2257.995995905), (8491.587743934, -122.554405845, -2220.424468871), (8491.691203813, -117.415711525, -2193.633868148), (8491.839494826, -110.486499029, -2155.196229849), (8491.94719067, -105.776548614, -2127.252822405), (8492.097047493, -99.703416286, -2088.328021256), (8492.206069748, -95.636659811, -2059.979107974), (8492.355991801, -90.53542312, -2020.952102344), (8492.463435111, -87.243463586, -1992.951127086), (8492.589615349, -83.836583026, -1960.026919128), (8492.674427741, -81.784291981, -1937.876030677), (8492.756287029, -80.057085918, -1916.474230313), (8492.802755817, -79.172003655, -1904.31679614), (8492.826917075, -78.742564987, -1897.992896513), (8492.832911869, -78.637931226, -1896.423668427)], [0, 0, 0, 0, 0.006406501, 0.01243527, 0.021468756, 0.026652485, 0.03613527, 0.040361874, 0.050352485, 0.053505235, 0.064061874, 0.06604018, 0.077205235, 0.077917643, 0.089095112, 0.08974018, 0.099529135, 0.101617643, 0.109175798, 0.112795112, 0.118014982, 0.123229135, 0.12602318, 0.132875798, 0.133187129, 0.139534913, 0.141714982, 0.145072765, 0.14972318, 0.149819578, 0.153737389, 0.15680172, 0.156887129, 0.159062281, 0.160899972, 0.163017729, 0.163234913, 0.165909021, 0.168772765, 0.169749183, 0.173519578, 0.174568397, 0.177437389, 0.180367786, 0.18050172, 0.182762281, 0.184599972, 0.186717729, 0.187108947, 0.189609021, 0.193449183, 0.194770427, 0.198268397, 0.203316152, 0.204067786, 0.210808947, 0.212714396, 0.218470427, 0.222940585, 0.227016152, 0.233950255, 0.236414396, 0.245697187, 0.246640585, 0.257650255, 0.258135474, 0.269397187, 0.271214202, 0.281835474, 0.284887791, 0.294914202, 0.299095999, 0.308587791, 0.31377818, 0.322795999, 0.328877354, 0.33747818, 0.344328147, 0.352577354, 0.368028147, 0.376010905, 0.399710905, 0.408254187, 0.431954187, 0.440484185, 0.464184185, 0.472134233, 0.495834233, 0.502649866, 0.526349866, 0.531521279, 0.555221279, 0.558268398, 0.581968398, 0.582455074, 0.603690459, 0.606155074, 0.621608427, 0.627390459, 0.635910174, 0.645308427, 0.646329529, 0.652670113, 0.6548, 0.656948054, 0.659610174, 0.663349751, 0.670029529, 0.673893203, 0.676370113, 0.6785, 0.680648054, 0.687049751, 0.688401904, 0.697593203, 0.706611667, 0.712101904, 0.728203086, 0.730311667, 0.751903086, 0.752769443, 0.776469443, 0.779869858, 0.803569858, 0.809020145, 0.832720145, 0.839709694, 0.863409694, 0.871420256, 0.895120256, 0.903610746, 0.927310746, 0.935748927, 0.959448927, 0.967307484, 0.982706501, 0.991007484, 0.997768756, 1, 1, 1, 1], 3),
    ]
    loft3 = Solid(Shell([*[Face.make_surface_from_curves(loft3_from[k], loft3_to[k]) for k in range(1)], Face(Wire(loft3_from)), Face(Wire(loft3_to))]))
    add(loft3)

    # Mirror2: Loft3 across plane
    add(loft3.mirror(Plane(origin=(0, 0, 0), x_dir=(0, 0, 1), z_dir=(1, 0, 0))))


solid = part.part
